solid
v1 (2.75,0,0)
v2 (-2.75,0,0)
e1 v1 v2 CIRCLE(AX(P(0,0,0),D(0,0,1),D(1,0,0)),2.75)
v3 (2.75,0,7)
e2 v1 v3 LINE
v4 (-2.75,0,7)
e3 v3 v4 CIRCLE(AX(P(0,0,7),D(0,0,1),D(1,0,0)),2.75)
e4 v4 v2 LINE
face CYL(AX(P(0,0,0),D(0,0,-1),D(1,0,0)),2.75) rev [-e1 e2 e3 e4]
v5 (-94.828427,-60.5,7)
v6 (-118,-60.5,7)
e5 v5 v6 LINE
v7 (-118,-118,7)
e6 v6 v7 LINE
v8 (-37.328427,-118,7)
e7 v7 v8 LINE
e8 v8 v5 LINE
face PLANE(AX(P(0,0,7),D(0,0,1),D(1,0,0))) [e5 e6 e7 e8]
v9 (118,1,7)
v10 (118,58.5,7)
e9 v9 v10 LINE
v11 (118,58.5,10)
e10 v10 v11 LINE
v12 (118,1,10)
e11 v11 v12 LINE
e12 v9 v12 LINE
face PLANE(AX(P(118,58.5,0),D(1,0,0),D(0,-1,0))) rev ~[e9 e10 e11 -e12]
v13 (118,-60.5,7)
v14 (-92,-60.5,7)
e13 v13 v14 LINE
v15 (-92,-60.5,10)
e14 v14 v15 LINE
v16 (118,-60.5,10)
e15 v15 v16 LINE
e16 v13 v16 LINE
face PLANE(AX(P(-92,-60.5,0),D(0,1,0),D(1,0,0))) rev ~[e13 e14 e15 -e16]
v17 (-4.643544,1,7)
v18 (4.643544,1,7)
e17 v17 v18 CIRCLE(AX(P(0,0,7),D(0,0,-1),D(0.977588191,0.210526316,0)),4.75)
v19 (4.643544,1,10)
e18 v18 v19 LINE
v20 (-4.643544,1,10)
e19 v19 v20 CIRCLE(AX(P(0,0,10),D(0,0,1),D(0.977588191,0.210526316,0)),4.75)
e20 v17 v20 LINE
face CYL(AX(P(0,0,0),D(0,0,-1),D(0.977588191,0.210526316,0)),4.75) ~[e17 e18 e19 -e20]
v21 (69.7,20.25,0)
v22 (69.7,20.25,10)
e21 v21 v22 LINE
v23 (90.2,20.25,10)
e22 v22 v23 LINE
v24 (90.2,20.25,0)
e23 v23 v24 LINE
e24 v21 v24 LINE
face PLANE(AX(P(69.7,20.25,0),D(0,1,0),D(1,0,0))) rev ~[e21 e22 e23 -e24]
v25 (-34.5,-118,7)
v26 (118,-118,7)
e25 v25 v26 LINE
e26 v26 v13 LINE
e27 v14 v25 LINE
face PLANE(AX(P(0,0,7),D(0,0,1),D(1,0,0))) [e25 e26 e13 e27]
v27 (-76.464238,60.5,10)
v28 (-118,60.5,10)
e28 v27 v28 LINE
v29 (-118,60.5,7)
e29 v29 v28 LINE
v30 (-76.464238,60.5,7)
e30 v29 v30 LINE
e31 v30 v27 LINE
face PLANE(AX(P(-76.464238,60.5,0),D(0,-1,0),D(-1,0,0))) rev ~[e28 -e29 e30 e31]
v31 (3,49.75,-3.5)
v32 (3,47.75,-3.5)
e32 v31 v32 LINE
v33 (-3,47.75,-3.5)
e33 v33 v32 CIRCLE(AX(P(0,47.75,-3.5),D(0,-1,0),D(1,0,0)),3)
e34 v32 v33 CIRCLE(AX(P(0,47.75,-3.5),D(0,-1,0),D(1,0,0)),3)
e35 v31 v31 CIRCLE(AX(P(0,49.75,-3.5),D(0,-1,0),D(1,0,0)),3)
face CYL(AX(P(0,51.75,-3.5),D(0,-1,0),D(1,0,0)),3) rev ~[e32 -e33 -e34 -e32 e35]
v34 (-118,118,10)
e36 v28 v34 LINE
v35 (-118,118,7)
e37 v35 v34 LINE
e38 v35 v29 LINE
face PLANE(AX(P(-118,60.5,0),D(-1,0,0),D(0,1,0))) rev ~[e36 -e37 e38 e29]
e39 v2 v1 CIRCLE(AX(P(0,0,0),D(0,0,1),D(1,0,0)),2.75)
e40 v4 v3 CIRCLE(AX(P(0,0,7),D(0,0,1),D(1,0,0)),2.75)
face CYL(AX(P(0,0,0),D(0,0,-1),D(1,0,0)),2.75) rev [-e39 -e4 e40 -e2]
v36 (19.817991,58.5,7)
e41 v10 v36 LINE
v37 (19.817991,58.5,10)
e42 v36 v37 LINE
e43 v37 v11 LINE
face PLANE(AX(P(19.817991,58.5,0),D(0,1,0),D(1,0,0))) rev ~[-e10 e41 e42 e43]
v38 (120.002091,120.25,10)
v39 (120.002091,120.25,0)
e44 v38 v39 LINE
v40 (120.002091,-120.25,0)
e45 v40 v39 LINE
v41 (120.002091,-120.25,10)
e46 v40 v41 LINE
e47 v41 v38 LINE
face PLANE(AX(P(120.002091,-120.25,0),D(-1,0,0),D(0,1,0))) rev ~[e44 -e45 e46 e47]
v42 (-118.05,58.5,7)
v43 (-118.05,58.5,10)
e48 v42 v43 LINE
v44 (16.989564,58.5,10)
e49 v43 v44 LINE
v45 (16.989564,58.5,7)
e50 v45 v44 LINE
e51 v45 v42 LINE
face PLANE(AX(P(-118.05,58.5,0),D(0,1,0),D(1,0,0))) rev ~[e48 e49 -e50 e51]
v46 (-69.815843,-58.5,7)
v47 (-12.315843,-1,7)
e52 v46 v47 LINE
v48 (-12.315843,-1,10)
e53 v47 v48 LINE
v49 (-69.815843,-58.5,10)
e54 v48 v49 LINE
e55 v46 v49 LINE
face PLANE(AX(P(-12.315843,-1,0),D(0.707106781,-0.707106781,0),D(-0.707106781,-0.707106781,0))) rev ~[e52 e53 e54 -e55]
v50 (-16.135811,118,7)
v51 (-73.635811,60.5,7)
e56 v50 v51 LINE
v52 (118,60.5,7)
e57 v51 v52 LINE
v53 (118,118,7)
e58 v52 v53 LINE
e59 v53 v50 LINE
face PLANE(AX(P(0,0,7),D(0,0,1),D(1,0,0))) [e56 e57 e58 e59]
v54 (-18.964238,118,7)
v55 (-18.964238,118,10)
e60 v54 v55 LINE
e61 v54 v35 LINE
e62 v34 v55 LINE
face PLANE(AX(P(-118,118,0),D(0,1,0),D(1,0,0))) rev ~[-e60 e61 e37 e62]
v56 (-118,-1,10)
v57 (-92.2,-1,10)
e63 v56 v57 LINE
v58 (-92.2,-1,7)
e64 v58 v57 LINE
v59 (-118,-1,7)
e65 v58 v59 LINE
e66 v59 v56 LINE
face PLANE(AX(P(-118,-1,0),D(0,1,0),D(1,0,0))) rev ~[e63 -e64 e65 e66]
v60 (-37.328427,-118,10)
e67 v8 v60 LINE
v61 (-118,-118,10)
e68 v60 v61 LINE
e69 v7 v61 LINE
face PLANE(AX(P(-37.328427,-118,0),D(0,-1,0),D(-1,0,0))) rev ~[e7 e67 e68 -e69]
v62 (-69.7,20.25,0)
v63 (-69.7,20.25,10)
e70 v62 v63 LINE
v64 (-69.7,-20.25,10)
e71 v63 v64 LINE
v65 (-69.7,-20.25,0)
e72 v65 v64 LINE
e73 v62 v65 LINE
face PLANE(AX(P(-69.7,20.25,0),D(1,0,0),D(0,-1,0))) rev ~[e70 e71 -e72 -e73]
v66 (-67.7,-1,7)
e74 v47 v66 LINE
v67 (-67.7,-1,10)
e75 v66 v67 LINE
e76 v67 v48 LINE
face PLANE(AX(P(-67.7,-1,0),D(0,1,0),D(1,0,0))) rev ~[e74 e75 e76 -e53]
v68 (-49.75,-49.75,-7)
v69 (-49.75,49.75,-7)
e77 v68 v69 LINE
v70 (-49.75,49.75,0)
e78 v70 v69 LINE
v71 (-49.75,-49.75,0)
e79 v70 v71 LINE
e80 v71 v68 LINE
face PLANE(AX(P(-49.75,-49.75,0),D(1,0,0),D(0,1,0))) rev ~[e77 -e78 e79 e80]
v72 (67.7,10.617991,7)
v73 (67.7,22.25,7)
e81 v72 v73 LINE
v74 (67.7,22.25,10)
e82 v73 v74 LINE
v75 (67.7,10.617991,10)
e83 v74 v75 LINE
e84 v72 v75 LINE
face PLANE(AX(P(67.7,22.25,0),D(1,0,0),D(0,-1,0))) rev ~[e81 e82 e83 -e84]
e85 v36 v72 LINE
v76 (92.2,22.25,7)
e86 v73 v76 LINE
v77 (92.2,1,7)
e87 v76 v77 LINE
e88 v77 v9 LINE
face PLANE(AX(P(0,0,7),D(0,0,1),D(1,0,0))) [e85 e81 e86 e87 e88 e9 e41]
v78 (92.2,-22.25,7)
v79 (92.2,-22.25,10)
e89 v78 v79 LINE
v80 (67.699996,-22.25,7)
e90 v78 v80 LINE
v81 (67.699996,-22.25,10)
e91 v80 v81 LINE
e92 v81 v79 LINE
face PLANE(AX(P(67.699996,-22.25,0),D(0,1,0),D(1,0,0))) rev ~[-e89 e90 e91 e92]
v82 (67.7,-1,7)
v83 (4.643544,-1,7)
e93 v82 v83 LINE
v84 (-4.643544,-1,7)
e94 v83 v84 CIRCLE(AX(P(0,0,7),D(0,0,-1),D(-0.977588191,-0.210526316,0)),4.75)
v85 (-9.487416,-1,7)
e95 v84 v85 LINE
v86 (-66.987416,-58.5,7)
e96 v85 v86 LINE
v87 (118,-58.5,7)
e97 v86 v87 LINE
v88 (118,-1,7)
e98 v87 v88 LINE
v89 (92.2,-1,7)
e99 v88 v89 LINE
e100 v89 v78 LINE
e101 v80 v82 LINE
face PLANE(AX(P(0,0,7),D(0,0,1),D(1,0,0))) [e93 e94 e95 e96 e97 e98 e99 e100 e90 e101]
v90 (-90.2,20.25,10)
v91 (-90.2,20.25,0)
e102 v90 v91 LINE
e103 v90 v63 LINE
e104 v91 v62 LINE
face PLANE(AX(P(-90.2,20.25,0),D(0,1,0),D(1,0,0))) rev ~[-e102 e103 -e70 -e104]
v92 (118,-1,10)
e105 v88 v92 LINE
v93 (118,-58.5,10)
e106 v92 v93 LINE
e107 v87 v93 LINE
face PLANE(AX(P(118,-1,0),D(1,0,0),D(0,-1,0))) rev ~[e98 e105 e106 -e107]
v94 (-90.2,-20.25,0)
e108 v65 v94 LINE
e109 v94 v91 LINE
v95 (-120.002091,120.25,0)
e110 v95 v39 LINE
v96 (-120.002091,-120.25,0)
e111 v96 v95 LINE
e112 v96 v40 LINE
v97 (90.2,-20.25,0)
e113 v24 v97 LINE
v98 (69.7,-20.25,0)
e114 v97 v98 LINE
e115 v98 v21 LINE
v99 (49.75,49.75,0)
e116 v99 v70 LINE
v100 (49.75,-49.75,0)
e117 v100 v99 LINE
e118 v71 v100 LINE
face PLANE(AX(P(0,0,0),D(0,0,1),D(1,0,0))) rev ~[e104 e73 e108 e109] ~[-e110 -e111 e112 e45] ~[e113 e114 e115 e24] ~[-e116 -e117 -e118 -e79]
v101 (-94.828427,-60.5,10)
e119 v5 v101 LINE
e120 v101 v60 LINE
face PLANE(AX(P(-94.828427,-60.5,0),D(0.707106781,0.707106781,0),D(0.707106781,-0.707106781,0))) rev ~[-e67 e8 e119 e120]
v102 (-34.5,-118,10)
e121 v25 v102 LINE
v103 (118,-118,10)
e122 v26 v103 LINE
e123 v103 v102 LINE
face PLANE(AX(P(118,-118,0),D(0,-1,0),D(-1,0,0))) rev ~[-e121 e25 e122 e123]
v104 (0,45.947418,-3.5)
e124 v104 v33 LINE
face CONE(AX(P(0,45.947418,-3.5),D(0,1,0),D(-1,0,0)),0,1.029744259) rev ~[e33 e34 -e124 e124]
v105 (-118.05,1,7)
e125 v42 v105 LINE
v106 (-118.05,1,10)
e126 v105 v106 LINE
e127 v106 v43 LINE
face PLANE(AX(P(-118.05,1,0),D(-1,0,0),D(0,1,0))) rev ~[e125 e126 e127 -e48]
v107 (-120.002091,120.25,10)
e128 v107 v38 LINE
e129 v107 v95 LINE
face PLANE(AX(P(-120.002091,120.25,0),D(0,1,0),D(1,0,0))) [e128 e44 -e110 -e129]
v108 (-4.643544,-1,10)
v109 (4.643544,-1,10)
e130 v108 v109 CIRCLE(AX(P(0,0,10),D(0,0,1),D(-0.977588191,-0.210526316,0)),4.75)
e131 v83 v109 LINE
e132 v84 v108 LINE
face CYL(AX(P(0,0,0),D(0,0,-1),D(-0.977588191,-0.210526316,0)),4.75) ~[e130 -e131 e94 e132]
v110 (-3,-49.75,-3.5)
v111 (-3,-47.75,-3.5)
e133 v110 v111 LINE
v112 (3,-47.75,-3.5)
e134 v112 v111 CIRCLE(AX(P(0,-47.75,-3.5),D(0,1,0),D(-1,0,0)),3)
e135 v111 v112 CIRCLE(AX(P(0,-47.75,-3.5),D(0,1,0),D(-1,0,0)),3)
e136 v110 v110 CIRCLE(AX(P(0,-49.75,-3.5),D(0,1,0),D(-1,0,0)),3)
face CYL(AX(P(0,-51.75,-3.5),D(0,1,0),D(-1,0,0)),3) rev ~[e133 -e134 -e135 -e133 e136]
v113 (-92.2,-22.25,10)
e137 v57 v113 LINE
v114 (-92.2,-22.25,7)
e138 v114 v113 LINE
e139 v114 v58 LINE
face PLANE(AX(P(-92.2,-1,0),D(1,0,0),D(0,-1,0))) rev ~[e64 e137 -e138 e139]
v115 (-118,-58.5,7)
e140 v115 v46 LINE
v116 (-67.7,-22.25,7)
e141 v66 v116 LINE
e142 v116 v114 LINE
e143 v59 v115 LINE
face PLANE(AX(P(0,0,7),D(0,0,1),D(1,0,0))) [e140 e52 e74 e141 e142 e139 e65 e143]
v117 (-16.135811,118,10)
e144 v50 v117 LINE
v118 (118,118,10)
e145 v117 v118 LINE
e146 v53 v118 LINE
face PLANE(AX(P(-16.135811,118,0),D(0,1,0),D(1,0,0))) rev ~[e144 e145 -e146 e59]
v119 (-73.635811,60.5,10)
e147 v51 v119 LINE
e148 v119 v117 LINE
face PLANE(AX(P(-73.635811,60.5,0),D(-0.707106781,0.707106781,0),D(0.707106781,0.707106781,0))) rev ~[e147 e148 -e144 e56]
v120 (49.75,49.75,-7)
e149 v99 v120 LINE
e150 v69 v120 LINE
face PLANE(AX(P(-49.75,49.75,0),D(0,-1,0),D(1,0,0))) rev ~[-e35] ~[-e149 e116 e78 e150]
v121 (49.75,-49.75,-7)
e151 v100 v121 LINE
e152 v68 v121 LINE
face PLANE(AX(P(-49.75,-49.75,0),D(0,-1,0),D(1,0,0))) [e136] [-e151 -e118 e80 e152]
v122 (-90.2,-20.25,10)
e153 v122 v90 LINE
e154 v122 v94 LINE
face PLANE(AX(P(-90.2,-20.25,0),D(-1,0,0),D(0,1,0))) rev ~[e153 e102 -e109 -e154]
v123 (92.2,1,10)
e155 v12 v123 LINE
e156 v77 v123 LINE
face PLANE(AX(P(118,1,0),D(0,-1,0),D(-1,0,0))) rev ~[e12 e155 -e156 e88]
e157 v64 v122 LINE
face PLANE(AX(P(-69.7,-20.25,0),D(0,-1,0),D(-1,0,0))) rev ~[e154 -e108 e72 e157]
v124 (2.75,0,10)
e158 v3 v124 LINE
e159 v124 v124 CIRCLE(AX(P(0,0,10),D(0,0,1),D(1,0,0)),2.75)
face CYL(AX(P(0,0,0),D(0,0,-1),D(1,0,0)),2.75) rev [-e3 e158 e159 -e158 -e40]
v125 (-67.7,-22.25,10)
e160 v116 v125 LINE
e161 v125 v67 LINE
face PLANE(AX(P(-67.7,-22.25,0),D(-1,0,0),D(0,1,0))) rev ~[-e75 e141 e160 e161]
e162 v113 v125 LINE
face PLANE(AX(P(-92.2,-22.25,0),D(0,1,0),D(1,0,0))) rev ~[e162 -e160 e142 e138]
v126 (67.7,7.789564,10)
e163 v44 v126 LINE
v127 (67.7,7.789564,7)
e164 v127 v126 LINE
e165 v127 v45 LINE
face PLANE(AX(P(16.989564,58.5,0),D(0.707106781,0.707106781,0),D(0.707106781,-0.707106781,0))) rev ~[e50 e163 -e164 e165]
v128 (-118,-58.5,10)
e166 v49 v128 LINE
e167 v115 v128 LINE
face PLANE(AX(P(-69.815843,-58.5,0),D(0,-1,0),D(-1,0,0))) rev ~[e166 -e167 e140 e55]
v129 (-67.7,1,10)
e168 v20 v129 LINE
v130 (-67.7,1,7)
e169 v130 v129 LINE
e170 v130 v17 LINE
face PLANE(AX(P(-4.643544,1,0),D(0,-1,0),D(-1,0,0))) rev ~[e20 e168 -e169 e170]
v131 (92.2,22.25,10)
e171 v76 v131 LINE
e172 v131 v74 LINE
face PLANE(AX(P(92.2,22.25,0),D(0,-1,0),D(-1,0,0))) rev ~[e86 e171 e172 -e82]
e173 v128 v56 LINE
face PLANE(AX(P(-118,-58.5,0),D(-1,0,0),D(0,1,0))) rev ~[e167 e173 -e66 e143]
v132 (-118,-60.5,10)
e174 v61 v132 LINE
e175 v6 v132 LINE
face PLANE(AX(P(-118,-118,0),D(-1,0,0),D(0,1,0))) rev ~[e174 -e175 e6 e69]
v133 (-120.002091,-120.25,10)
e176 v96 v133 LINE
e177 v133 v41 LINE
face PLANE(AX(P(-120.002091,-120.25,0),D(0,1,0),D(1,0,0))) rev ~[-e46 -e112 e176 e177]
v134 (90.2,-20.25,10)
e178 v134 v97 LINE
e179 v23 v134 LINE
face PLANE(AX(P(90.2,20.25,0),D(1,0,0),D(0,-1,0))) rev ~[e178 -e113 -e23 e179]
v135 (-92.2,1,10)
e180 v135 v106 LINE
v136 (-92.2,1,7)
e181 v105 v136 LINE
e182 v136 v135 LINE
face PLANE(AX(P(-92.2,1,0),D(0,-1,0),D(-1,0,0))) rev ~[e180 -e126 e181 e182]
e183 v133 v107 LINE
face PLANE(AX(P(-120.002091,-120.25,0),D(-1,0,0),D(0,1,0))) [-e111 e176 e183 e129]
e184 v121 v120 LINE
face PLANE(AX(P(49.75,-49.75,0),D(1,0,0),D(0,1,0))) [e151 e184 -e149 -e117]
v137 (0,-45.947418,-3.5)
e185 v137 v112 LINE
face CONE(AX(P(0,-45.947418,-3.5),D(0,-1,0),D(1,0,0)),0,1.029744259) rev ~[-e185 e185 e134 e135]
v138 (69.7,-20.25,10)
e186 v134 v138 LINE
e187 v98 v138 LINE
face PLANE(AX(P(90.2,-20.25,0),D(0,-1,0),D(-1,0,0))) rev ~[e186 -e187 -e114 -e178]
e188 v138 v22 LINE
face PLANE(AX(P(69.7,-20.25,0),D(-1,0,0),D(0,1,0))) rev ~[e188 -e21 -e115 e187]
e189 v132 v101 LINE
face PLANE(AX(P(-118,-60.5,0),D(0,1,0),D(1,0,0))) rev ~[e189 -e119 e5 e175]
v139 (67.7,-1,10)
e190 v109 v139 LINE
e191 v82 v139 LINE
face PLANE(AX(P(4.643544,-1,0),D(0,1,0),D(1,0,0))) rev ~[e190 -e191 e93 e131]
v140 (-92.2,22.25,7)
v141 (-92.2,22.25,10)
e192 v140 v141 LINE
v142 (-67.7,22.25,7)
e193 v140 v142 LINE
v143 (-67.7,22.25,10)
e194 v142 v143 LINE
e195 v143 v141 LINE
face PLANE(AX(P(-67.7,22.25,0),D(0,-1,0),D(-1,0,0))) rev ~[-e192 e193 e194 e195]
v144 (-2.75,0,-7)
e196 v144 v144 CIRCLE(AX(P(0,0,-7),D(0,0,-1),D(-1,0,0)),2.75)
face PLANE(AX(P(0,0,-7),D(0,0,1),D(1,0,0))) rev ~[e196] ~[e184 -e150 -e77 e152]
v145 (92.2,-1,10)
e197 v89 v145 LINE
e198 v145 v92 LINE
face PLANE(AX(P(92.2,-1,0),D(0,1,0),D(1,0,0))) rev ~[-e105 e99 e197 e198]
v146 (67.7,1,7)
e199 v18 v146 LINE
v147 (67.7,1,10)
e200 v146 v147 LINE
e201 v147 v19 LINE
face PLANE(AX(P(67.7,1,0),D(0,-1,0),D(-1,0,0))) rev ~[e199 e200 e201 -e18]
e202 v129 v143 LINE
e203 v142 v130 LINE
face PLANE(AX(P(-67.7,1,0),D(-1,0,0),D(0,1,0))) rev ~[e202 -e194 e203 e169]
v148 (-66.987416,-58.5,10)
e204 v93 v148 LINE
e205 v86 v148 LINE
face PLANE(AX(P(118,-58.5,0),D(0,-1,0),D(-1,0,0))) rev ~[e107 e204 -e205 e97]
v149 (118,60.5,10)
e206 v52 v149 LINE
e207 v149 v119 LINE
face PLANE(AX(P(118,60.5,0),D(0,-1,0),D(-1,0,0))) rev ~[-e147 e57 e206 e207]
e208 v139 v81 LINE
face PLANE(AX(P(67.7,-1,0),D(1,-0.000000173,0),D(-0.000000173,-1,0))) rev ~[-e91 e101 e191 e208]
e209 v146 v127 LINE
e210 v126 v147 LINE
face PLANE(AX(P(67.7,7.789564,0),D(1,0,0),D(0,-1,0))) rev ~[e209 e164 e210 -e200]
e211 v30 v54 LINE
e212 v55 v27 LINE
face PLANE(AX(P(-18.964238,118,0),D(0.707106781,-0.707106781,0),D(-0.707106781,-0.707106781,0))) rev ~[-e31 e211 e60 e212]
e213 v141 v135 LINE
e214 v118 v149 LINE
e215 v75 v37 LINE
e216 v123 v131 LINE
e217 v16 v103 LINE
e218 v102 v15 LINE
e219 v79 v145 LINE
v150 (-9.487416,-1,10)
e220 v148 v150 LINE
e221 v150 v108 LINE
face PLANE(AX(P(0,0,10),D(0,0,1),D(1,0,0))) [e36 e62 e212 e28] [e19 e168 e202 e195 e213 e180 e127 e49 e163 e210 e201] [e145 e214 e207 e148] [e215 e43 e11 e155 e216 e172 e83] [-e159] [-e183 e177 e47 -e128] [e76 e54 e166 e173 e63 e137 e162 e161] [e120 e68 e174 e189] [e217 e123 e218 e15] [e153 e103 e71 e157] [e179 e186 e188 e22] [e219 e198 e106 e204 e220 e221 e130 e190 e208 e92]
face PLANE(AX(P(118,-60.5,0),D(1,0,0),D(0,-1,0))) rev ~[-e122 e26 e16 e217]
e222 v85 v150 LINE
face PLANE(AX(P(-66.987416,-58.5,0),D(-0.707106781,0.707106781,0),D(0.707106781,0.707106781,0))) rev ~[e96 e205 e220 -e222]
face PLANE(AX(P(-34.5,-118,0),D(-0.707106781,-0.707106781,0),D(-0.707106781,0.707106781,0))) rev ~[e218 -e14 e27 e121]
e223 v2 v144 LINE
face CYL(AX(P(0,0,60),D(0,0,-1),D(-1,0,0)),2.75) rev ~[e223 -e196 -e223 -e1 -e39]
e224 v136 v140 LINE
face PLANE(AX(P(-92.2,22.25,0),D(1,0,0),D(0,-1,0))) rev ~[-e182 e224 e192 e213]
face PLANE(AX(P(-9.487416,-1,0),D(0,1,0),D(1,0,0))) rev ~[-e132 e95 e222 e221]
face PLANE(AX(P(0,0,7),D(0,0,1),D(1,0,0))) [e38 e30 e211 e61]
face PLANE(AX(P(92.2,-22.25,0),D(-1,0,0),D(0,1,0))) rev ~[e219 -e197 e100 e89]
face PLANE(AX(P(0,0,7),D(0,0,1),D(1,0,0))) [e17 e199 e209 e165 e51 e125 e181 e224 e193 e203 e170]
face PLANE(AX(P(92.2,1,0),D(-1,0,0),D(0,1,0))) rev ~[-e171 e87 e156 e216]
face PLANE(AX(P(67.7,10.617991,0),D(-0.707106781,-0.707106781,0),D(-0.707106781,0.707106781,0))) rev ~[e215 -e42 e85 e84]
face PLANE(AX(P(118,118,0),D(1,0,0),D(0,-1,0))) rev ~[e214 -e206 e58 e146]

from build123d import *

# Parameters (mm, degrees)
F0_W     = 240.0041820114
F0_H     = 240.5
F0_R     = 2.75
F2_DEPTH = 7
F1_W     = 99.5
F1_H     = 99.5
F3_DEPTH = 7
F4_D     = 5.5
F4_DEPTH = 60
F4_TIP   = 1.6523667023
F5_DEPTH = 10
F7_D     = 6
F7_DEPTH = 2
F7_TIP   = 1.8025818571
F9_D     = 6
F9_DEPTH = 2
F9_TIP   = 1.8025818571


# Not quite as in the source:
# - a feature names something its author has since deleted; it is built from what else it names


with BuildPart() as f2:
    # F0 (on Top) → F2 (new body)
    with BuildSketch(Plane.XY):
        Rectangle(F0_W, F0_H)
        Polygon((-118, -60.5), (-94.8284271247, -60.5), (-37.3284271247, -118), (-118, -118), align=None, mode=Mode.SUBTRACT)
        Polygon((-69.8158430413, -58.5), (-118, -58.5), (-118, -1), (-92.2, -1), (-92.2, -22.25), (-67.7, -22.25), (-67.7, -1), (-12.3158430413, -1), align=None, mode=Mode.SUBTRACT)
        Polygon((118, -118), (-34.5, -118), (-92, -60.5), (118, -60.5), align=None, mode=Mode.SUBTRACT)
        with BuildLine():
            Line((118, -1), (118, -58.5))
            Line((118, -58.5), (-66.9874159165, -58.5))
            Line((-66.9874159165, -58.5), (-9.4874159165, -1))
            Line((-9.4874159165, -1), (-4.6435439053, -1))
            ThreePointArc((-4.6435439053, -1), (0, -4.75), (4.6435439053, -1))
            Line((4.6435439053, -1), (67.6999996539, -1))
            Line((67.6999996539, -1), (67.699995977, -22.25))
            Line((67.699995977, -22.25), (92.2, -22.25))
            Line((92.2, -22.25), (92.2, -1))
            Line((92.2, -1), (118, -1))
        make_face(mode=Mode.SUBTRACT)
        Polygon((-69.7, 20.25), (-69.7, 0), (-69.7, -20.25), (-90.2, -20.25), (-90.2, 0), (-90.2, 20.25), align=None, mode=Mode.SUBTRACT)
        with BuildLine():
            Line((-118.05, 1), (-118.05, 58.5))
            Line((-118.05, 58.5), (16.9895635103, 58.5))
            Line((16.9895635103, 58.5), (67.7, 7.7895635103))
            Line((67.7, 7.7895635103), (67.7, 1))
            Line((67.7, 1), (4.6435439053, 1))
            ThreePointArc((4.6435439053, 1), (0, 4.75), (-4.6435439053, 1))
            Line((-4.6435439053, 1), (-67.7, 1))
            Line((-67.7, 1), (-67.7, 22.25))
            Line((-67.7, 22.25), (-92.2, 22.25))
            Line((-92.2, 22.25), (-92.2, 1))
            Line((-92.2, 1), (-118.05, 1))
        make_face(mode=Mode.SUBTRACT)
        Polygon((-118, 60.5), (-118, 118), (-18.9642378869, 118), (-76.4642378869, 60.5), align=None, mode=Mode.SUBTRACT)
        Circle(F0_R, mode=Mode.SUBTRACT)
        Polygon((69.7, -20.25), (69.7, -2.25), (69.7, 20.25), (90.2, 20.25), (90.2, -2.25), (90.2, -20.25), align=None, mode=Mode.SUBTRACT)
        Polygon((67.7, 22.25), (67.7, 10.617990635), (19.817990635, 58.5), (118, 58.5), (118, 0.9999998737), (92.2, 0.9999998737), (92.2, 22.25), align=None, mode=Mode.SUBTRACT)
        Polygon((118, 118), (118, 60.5), (-73.6358107621, 60.5), (-16.1358107621, 118), align=None, mode=Mode.SUBTRACT)
        Polygon((-92, -60.5), (-34.5, -118), (118, -118), (118, -60.5), align=None)
        Polygon((-73.6358107621, 60.5), (118, 60.5), (118, 118), (-16.1358107621, 118), align=None)
        with BuildLine():
            Line((16.9895635103, 58.5), (-118.05, 58.5))
            Line((-118.05, 58.5), (-118.05, 1))
            Line((-118.05, 1), (-92.2, 1))
            Line((-92.2, 1), (-92.2, 22.25))
            Line((-92.2, 22.25), (-67.7, 22.25))
            Line((-67.7, 22.25), (-67.7, 1))
            Line((-67.7, 1), (-4.6435439053, 1))
            ThreePointArc((-4.6435439053, 1), (0, 4.75), (4.6435439053, 1))
            Line((4.6435439053, 1), (67.7, 1))
            Line((67.7, 1), (67.7, 7.7895635103))
            Line((67.7, 7.7895635103), (16.9895635103, 58.5))
        make_face()
        with BuildLine():
            Line((-66.9874159165, -58.5), (118, -58.5))
            Line((118, -58.5), (118, -1))
            Line((118, -1), (92.2, -1))
            Line((92.2, -1), (92.2, -22.25))
            Line((92.2, -22.25), (67.699995977, -22.25))
            Line((67.699995977, -22.25), (67.6999996539, -1))
            Line((67.6999996539, -1), (4.6435439053, -1))
            ThreePointArc((4.6435439053, -1), (0, -4.75), (-4.6435439053, -1))
            Line((-4.6435439053, -1), (-9.4874159165, -1))
            Line((-9.4874159165, -1), (-66.9874159165, -58.5))
        make_face()
        Polygon((-18.9642378869, 118), (-118, 118), (-118, 60.5), (-76.4642378869, 60.5), align=None)
        Polygon((-118, -1), (-118, -58.5), (-69.8158430413, -58.5), (-12.3158430413, -1), (-67.7, -1), (-67.7, -22.25), (-92.2, -22.25), (-92.2, -1), align=None)
        Polygon((19.817990635, 58.5), (67.7, 10.617990635), (67.7, 22.25), (92.2, 22.25), (92.2, 0.9999998737), (118, 0.9999998737), (118, 58.5), align=None)
        Polygon((-37.3284271247, -118), (-94.8284271247, -60.5), (-118, -60.5), (-118, -118), align=None)
    extrude(amount=F2_DEPTH)

    # F1 (on Top) → F3 (join)
    with BuildSketch(Plane.XY):
        Rectangle(F1_W, F1_H)
    extrude(amount=-F3_DEPTH)

    # F4
    with Locations(Plane.XY):
        with Locations((0, 0)):
            Hole(F4_D / 2, depth=F4_DEPTH)
            with Locations((0, 0, -(F4_DEPTH + F4_TIP / 2))):  # 118° drill point
                Cone(0, F4_D / 2, F4_TIP, mode=Mode.SUBTRACT)

    # F0 (on Top) → F5 (join)
    with BuildSketch(Plane.XY):
        Rectangle(F0_W, F0_H)
        Polygon((-118, -60.5), (-94.8284271247, -60.5), (-37.3284271247, -118), (-118, -118), align=None, mode=Mode.SUBTRACT)
        Polygon((-69.8158430413, -58.5), (-118, -58.5), (-118, -1), (-92.2, -1), (-92.2, -22.25), (-67.7, -22.25), (-67.7, -1), (-12.3158430413, -1), align=None, mode=Mode.SUBTRACT)
        Polygon((118, -118), (-34.5, -118), (-92, -60.5), (118, -60.5), align=None, mode=Mode.SUBTRACT)
        with BuildLine():
            Line((118, -1), (118, -58.5))
            Line((118, -58.5), (-66.9874159165, -58.5))
            Line((-66.9874159165, -58.5), (-9.4874159165, -1))
            Line((-9.4874159165, -1), (-4.6435439053, -1))
            ThreePointArc((-4.6435439053, -1), (0, -4.75), (4.6435439053, -1))
            Line((4.6435439053, -1), (67.6999996539, -1))
            Line((67.6999996539, -1), (67.699995977, -22.25))
            Line((67.699995977, -22.25), (92.2, -22.25))
            Line((92.2, -22.25), (92.2, -1))
            Line((92.2, -1), (118, -1))
        make_face(mode=Mode.SUBTRACT)
        Polygon((-69.7, 20.25), (-69.7, 0), (-69.7, -20.25), (-90.2, -20.25), (-90.2, 0), (-90.2, 20.25), align=None, mode=Mode.SUBTRACT)
        with BuildLine():
            Line((-118.05, 1), (-118.05, 58.5))
            Line((-118.05, 58.5), (16.9895635103, 58.5))
            Line((16.9895635103, 58.5), (67.7, 7.7895635103))
            Line((67.7, 7.7895635103), (67.7, 1))
            Line((67.7, 1), (4.6435439053, 1))
            ThreePointArc((4.6435439053, 1), (0, 4.75), (-4.6435439053, 1))
            Line((-4.6435439053, 1), (-67.7, 1))
            Line((-67.7, 1), (-67.7, 22.25))
            Line((-67.7, 22.25), (-92.2, 22.25))
            Line((-92.2, 22.25), (-92.2, 1))
            Line((-92.2, 1), (-118.05, 1))
        make_face(mode=Mode.SUBTRACT)
        Polygon((-118, 60.5), (-118, 118), (-18.9642378869, 118), (-76.4642378869, 60.5), align=None, mode=Mode.SUBTRACT)
        Circle(F0_R, mode=Mode.SUBTRACT)
        Polygon((69.7, -20.25), (69.7, -2.25), (69.7, 20.25), (90.2, 20.25), (90.2, -2.25), (90.2, -20.25), align=None, mode=Mode.SUBTRACT)
        Polygon((67.7, 22.25), (67.7, 10.617990635), (19.817990635, 58.5), (118, 58.5), (118, 0.9999998737), (92.2, 0.9999998737), (92.2, 22.25), align=None, mode=Mode.SUBTRACT)
        Polygon((118, 118), (118, 60.5), (-73.6358107621, 60.5), (-16.1358107621, 118), align=None, mode=Mode.SUBTRACT)
    extrude(amount=F5_DEPTH)

    # F7
    with Locations(Plane.XZ.offset(49.75)):
        with Locations((0, -3.5)):
            Hole(F7_D / 2, depth=F7_DEPTH)
            with Locations((0, 0, -(F7_DEPTH + F7_TIP / 2))):  # 118° drill point
                Cone(0, F7_D / 2, F7_TIP, mode=Mode.SUBTRACT)

    # F9
    with Locations(Plane(origin=(0, 49.75, 0), x_dir=(-1, 0, 0), z_dir=(0, 1, 0))):
        with Locations((0, -3.5)):
            Hole(F9_D / 2, depth=F9_DEPTH)
            with Locations((0, 0, -(F9_DEPTH + F9_TIP / 2))):  # 118° drill point
                Cone(0, F9_D / 2, F9_TIP, mode=Mode.SUBTRACT)


solid = f2.part
